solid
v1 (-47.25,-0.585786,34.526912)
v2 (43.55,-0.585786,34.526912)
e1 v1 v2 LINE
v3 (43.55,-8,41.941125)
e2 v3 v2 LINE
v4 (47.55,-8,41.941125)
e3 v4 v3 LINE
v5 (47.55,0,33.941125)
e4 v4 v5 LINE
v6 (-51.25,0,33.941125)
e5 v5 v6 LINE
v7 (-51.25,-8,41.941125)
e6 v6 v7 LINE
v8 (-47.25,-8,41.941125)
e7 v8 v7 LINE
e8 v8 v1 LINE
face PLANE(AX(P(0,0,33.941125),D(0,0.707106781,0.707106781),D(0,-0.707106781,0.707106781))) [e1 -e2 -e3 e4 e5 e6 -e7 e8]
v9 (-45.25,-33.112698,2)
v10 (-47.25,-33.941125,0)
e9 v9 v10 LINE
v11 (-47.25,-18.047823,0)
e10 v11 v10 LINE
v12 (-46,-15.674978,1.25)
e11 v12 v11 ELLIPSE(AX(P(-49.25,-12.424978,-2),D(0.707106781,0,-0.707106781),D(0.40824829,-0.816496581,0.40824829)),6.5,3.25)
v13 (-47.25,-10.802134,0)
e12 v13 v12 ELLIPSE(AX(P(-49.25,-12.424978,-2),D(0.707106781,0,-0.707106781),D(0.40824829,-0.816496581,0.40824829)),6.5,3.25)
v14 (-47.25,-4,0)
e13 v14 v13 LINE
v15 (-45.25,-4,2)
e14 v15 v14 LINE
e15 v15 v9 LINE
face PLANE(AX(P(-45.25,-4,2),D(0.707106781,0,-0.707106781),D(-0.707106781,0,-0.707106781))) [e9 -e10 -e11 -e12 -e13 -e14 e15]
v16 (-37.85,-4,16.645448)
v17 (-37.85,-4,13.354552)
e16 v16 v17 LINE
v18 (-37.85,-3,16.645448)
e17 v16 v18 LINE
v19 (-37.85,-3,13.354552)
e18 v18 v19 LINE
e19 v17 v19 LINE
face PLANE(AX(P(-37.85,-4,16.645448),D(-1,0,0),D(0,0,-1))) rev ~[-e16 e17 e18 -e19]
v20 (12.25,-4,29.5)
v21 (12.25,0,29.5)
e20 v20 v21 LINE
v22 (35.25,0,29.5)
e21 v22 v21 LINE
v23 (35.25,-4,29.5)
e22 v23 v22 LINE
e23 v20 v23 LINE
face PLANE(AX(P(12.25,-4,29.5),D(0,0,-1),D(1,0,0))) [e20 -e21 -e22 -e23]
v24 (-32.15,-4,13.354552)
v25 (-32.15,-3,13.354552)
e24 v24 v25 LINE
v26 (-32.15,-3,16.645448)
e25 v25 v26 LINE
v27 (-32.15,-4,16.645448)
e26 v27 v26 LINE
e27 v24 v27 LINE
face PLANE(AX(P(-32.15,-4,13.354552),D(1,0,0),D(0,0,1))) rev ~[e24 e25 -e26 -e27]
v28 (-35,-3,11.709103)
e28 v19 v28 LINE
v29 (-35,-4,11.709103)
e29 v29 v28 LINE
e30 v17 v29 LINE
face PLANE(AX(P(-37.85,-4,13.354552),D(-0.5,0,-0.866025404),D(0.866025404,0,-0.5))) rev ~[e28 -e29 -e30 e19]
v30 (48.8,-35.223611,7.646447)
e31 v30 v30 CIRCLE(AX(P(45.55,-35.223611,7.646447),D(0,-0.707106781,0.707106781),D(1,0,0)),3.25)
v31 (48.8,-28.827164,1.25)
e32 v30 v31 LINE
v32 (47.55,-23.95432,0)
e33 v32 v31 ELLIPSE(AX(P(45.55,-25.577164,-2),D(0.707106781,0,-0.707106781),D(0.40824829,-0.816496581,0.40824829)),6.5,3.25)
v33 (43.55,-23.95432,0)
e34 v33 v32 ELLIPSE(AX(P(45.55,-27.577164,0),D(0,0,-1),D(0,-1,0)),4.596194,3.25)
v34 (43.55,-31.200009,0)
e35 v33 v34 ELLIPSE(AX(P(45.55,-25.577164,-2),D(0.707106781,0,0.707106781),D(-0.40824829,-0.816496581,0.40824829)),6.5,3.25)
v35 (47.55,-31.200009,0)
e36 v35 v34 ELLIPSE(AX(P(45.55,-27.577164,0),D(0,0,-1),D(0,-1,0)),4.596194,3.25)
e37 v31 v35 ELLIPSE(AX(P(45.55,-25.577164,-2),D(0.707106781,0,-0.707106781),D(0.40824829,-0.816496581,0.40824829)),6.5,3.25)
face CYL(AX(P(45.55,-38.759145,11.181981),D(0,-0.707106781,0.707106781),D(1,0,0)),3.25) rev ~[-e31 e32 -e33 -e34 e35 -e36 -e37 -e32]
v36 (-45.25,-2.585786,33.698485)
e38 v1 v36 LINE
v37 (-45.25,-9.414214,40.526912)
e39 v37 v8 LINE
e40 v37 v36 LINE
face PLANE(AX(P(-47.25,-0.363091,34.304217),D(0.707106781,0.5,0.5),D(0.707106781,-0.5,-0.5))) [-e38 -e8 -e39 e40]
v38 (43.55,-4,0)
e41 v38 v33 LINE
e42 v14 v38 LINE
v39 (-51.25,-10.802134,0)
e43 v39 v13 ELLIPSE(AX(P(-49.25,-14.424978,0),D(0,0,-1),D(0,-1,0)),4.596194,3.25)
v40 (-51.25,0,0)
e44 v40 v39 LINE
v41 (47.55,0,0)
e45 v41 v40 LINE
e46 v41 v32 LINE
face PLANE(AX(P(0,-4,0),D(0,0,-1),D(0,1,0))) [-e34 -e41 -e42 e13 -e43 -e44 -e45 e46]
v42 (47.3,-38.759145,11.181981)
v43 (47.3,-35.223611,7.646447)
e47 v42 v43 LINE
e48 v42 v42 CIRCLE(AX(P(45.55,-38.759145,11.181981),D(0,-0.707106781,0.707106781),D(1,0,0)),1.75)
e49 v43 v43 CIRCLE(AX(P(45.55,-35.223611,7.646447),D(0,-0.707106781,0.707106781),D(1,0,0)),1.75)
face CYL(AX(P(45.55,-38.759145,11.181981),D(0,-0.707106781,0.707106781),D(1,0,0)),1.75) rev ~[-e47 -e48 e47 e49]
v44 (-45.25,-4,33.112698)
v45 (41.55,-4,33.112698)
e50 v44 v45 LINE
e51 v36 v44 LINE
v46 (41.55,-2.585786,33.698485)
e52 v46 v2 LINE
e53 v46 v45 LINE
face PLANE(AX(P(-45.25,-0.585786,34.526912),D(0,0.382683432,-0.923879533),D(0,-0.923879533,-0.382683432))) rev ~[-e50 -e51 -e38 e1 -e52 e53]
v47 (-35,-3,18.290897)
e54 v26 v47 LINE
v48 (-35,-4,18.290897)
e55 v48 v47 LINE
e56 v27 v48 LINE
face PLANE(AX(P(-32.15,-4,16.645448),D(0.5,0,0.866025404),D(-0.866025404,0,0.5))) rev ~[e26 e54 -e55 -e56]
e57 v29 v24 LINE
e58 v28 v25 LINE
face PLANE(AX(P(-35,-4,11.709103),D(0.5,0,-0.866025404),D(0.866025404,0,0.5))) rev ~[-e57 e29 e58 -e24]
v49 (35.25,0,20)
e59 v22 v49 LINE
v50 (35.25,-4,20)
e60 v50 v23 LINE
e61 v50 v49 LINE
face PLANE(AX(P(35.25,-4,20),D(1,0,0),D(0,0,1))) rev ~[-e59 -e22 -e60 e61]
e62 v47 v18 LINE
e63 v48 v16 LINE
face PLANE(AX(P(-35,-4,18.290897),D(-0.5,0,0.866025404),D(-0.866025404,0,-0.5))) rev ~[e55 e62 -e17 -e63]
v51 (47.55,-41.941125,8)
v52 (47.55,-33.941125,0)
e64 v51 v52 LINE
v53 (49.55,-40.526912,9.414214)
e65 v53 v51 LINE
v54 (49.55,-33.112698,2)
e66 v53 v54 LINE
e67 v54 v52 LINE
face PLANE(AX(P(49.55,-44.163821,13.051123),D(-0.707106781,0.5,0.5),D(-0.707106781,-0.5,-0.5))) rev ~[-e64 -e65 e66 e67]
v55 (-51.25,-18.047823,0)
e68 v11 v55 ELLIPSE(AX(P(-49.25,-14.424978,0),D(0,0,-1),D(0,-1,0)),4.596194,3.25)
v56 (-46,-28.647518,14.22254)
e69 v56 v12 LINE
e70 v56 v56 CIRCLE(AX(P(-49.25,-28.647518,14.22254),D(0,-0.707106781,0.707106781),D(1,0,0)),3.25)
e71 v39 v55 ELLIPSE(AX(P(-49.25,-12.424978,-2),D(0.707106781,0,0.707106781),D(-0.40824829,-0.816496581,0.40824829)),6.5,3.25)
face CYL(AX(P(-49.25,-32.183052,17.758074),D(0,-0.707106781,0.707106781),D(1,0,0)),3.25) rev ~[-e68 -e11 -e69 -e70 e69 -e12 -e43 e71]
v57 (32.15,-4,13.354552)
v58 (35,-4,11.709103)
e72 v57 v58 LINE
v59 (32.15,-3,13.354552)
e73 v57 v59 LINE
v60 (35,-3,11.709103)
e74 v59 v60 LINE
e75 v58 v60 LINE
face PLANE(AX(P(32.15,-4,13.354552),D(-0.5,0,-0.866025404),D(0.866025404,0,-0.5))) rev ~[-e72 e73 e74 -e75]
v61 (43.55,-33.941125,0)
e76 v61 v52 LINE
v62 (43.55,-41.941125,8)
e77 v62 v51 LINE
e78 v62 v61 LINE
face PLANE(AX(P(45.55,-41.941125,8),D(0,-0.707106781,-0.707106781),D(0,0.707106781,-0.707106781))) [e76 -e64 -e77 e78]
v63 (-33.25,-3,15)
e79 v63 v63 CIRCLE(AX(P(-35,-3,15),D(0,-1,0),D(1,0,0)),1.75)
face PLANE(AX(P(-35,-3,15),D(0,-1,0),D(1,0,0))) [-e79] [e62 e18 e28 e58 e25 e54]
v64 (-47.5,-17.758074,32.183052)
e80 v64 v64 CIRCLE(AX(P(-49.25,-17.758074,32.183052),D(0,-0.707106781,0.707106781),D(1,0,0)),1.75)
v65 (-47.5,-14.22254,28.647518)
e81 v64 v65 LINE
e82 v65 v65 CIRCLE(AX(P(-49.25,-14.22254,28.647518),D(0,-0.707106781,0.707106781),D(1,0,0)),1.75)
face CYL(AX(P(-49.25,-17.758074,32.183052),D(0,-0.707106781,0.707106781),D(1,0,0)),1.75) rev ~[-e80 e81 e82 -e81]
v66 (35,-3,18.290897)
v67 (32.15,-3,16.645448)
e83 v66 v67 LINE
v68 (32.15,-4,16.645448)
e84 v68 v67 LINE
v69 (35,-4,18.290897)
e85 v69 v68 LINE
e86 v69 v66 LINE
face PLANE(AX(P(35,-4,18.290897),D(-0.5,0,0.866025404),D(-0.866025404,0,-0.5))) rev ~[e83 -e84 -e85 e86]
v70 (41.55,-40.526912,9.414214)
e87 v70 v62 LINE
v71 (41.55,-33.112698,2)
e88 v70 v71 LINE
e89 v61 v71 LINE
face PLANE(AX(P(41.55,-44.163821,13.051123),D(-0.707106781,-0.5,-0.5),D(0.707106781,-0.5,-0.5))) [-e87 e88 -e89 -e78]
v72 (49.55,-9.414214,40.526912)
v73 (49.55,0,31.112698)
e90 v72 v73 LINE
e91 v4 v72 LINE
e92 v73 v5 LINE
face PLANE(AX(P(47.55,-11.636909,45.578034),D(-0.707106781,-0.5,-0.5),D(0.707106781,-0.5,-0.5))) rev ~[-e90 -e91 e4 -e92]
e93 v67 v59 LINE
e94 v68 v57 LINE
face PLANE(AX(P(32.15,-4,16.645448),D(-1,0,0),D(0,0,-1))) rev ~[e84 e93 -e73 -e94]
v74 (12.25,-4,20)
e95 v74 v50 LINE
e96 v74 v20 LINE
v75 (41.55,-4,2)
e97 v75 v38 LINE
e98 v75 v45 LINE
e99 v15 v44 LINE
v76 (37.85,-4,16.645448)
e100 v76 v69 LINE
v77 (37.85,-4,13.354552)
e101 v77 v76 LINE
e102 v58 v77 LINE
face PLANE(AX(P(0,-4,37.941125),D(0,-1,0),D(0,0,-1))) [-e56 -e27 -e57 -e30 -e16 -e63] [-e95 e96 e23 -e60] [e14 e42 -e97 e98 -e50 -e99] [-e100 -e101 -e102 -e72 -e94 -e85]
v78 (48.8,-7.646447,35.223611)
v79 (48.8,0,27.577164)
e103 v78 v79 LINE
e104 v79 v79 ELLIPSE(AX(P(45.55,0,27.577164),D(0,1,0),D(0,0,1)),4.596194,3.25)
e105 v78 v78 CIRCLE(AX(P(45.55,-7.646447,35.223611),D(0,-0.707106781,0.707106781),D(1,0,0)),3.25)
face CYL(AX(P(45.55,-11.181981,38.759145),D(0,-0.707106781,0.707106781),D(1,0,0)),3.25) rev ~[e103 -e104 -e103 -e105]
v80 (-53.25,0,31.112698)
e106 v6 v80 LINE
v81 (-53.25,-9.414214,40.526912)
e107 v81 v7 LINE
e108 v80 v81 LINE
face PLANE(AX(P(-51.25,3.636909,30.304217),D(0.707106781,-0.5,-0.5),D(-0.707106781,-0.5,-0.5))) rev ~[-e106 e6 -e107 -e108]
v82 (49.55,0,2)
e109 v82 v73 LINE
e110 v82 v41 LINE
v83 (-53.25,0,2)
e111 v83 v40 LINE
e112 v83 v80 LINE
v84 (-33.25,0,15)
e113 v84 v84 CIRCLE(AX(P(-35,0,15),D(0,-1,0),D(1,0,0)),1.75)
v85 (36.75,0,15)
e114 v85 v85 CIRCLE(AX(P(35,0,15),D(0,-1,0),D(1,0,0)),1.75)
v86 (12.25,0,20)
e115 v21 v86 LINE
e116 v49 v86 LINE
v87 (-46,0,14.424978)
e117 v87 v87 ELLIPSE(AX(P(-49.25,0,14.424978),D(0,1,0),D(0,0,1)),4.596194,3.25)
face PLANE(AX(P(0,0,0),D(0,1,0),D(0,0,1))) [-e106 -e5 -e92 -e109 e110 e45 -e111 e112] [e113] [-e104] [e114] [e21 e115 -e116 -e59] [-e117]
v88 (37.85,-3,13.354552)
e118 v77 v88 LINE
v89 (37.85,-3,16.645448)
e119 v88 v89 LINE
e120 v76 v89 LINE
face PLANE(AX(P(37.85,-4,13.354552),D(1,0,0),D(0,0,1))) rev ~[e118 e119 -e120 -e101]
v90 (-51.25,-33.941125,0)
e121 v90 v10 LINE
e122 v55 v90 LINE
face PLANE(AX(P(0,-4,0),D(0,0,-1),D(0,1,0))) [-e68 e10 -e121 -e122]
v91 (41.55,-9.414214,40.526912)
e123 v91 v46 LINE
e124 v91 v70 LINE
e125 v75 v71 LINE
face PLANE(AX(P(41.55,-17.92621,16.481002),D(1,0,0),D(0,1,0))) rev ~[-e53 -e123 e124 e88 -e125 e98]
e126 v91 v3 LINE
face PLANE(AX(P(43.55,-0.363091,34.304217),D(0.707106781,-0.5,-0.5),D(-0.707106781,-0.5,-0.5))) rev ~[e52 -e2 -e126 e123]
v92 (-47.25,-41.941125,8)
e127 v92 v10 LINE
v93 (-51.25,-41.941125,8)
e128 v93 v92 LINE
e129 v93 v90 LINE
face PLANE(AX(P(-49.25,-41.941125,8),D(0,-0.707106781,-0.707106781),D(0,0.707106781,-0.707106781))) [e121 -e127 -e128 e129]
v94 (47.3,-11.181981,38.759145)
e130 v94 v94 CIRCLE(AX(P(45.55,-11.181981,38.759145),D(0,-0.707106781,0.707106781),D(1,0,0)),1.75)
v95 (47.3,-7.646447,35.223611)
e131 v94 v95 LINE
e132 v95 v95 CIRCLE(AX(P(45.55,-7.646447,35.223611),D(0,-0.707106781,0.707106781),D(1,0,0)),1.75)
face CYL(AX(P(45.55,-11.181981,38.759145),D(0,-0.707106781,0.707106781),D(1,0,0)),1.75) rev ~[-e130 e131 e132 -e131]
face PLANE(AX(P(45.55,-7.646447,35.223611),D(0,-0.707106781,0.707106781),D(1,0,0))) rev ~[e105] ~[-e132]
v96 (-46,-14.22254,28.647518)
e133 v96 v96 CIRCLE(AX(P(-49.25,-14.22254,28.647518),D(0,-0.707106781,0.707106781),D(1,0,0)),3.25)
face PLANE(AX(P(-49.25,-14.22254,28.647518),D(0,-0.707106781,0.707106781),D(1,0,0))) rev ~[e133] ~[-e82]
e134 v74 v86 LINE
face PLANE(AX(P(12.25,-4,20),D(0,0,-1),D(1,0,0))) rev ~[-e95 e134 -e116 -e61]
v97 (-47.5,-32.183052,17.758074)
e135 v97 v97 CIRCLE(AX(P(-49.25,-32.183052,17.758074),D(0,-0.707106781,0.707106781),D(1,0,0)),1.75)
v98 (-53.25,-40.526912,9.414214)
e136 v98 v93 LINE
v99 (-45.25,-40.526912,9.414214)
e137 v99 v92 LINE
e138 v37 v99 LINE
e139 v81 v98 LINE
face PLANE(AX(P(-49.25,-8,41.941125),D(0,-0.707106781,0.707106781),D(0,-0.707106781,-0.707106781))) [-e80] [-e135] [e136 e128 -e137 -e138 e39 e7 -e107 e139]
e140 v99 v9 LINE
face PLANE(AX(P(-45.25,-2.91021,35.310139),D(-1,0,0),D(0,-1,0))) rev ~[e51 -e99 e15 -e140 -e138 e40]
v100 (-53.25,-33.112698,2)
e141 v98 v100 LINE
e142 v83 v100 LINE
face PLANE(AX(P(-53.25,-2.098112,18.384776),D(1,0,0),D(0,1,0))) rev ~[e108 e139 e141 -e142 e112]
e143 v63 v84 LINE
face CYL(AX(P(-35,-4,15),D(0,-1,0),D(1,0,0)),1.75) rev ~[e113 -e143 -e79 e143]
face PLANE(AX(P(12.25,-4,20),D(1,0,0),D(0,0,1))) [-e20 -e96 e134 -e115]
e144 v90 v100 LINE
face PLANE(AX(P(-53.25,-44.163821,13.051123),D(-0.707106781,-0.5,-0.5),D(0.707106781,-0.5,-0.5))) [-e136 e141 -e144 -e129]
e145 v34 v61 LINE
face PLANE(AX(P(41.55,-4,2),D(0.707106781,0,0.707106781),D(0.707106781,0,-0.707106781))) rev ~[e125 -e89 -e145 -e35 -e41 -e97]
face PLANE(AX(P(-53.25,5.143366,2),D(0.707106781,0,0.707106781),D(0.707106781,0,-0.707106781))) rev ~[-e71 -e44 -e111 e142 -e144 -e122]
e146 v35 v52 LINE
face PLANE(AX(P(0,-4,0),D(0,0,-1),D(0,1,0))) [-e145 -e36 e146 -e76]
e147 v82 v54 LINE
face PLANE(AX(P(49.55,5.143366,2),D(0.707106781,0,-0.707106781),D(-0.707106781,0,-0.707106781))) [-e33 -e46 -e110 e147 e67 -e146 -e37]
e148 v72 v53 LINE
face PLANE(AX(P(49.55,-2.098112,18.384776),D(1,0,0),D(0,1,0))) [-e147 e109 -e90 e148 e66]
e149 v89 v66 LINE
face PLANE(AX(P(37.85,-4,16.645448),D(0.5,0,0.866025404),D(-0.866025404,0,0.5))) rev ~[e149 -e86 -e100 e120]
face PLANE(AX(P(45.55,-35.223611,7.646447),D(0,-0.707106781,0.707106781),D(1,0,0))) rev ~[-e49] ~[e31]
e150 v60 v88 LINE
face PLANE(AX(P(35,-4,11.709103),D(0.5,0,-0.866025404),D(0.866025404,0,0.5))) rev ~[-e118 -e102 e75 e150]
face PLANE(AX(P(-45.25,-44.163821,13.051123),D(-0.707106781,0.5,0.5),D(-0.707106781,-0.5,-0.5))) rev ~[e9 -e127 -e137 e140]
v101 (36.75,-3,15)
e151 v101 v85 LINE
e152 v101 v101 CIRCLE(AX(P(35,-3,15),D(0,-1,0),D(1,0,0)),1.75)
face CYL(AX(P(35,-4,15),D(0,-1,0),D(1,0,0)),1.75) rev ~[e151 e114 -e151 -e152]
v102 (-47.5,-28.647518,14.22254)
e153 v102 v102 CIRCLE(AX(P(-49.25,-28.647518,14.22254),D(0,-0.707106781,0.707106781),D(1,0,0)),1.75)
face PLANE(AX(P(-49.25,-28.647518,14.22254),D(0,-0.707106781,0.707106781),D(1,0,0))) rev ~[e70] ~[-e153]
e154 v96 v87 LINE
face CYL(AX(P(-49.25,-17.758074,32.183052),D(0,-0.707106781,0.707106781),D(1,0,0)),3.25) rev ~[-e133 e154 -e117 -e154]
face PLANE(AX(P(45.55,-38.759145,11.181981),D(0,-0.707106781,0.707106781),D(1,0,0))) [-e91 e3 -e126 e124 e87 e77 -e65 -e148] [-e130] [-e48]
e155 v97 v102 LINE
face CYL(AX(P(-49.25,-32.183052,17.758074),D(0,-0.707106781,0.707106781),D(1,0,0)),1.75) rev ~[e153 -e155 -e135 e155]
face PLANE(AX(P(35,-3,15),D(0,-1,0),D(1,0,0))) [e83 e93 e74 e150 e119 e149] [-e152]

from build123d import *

# Parameters (mm, degrees)
F2_DEPTH      = 4
F5_DEPTH      = 49.55
F5_DEPTH_BACK = 53.25
F6_R          = 3.25
F6_R_2        = 1.75
F7_DEPTH      = 35.314708499
F8_DEPTH      = 5
F9_R          = 1.75
F9_W          = 23
F9_H          = 9.5
F10_DEPTH     = 4.001
F11_DEPTH     = 1
F12_T1_DEPTH  = 21.6004404508
F12_T3_DEPTH  = 86.8
F12_T5_DEPTH  = 21.6004404508
F12_T7_DEPTH  = 44.2278574488
F12_T9_DEPTH  = 35.0844914729
F12_T14_DEPTH = 15.9435862014
F12_T19_DEPTH = 15.9435862014
F12_T25_DEPTH = 98.9490097203
F12_S28_R     = 3.25
F12_T29_DEPTH = 51
F12_T32_DEPTH = 10.8002202254
F12_T39_DEPTH = 10.8002202254
F12_T43_DEPTH = 98.9490097203


# Not quite as in the source:
# - a fillet or chamfer that OpenCascade refuses, or shapes differently, is made with other operations: its cross-section is extruded or revolved along the edge and cut away or added


with BuildPart() as f2:
    # F0 (on Right) → F2 (new body, symmetric)
    with BuildSketch(Plane.YZ):
        Polygon((-8, 41.941125497), (-24.9705627485, 24.9705627485), (-41.941125497, 8), (-33.941125497, 0), (-4, 0), (-4, 37.941125497), align=None)
    extrude(amount=F2_DEPTH, both=True)


with BuildPart() as f3_1:
    # F3: copy of F2
    add(f2.part.moved(Location((-49.25, 0, 0))))


with BuildPart() as f2_1:
    # F4: moved
    add(f2.part.moved(Location((45.55, 0, 0))))


    add(f3_1.part)  # F5 merges F3_1
    # F0 (on Right) → F5 (join, two sides)
    with BuildSketch(Plane.YZ) as f5_sk:
        Polygon((0, 33.941125497), (-4, 37.941125497), (-4, 0), (0, 0), align=None)
    extrude(amount=F5_DEPTH)
    extrude(f5_sk.sketch, amount=-F5_DEPTH_BACK)

    # F6 (on line) → F7 (cut, through all)
    with BuildSketch(Plane(origin=(0, -24.9705627485, 24.9705627485), x_dir=(1, 0, 0), z_dir=(0, -0.7071067812, 0.7071067812))):
        with Locations((-49.25, 10.2)):
            Circle(F6_R)
        with Locations((-49.25, 10.2)):
            Circle(F6_R_2, mode=Mode.SUBTRACT)
        with Locations((-49.25, 10.2)):
            Circle(F6_R_2)
        with Locations((-49.25, -10.2)):
            Circle(F6_R)
        with Locations((-49.25, -10.2)):
            Circle(F6_R_2, mode=Mode.SUBTRACT)
        with Locations((-49.25, -10.2)):
            Circle(F6_R_2)
        with Locations((45.55, 19.5)):
            Circle(F6_R)
        with Locations((45.55, 19.5)):
            Circle(F6_R_2, mode=Mode.SUBTRACT)
        with Locations((45.55, 19.5)):
            Circle(F6_R_2)
        with Locations((45.55, -19.5)):
            Circle(F6_R)
        with Locations((45.55, -19.5)):
            Circle(F6_R_2, mode=Mode.SUBTRACT)
        with Locations((45.55, -19.5)):
            Circle(F6_R_2)
    extrude(amount=-F7_DEPTH, mode=Mode.SUBTRACT)

    # F6 (on line) → F8 (join)
    with BuildSketch(Plane(origin=(0, -24.9705627485, 24.9705627485), x_dir=(1, 0, 0), z_dir=(0, -0.7071067812, 0.7071067812))):
        with Locations((45.55, -19.5)):
            Circle(F6_R)
        with Locations((45.55, -19.5)):
            Circle(F6_R_2, mode=Mode.SUBTRACT)
        with Locations((45.55, 19.5)):
            Circle(F6_R)
        with Locations((45.55, 19.5)):
            Circle(F6_R_2, mode=Mode.SUBTRACT)
        with Locations((-49.25, 10.2)):
            Circle(F6_R)
        with Locations((-49.25, 10.2)):
            Circle(F6_R_2, mode=Mode.SUBTRACT)
        with Locations((-49.25, -10.2)):
            Circle(F6_R)
        with Locations((-49.25, -10.2)):
            Circle(F6_R_2, mode=Mode.SUBTRACT)
    extrude(amount=-F8_DEPTH)

    # F9 (on face) → F10 (cut, through all)
    with BuildSketch(Plane.XZ.offset(4)):
        with Locations((-35, 15)):
            Circle(F9_R)
        with Locations((35, 15)):
            Circle(F9_R)
        with Locations((23.75, 24.75)):
            Rectangle(F9_W, F9_H)
    extrude(amount=-F10_DEPTH, mode=Mode.SUBTRACT)

    # F9 (on face) → F11 (cut)
    with BuildSketch(Plane.XZ.offset(4)):
        Polygon((-32.15, 13.3545517328), (-32.15, 16.6454482672), (-35, 18.2908965344), (-37.85, 16.6454482672), (-37.85, 13.3545517328), (-35, 11.7091034656), align=None)
        with Locations((-35, 15)):
            Circle(F9_R, mode=Mode.SUBTRACT)
        Polygon((37.85, 13.3545517328), (37.85, 16.6454482672), (35, 18.2908965344), (32.15, 16.6454482672), (32.15, 13.3545517328), (35, 11.7091034656), align=None)
        with Locations((35, 15)):
            Circle(F9_R, mode=Mode.SUBTRACT)
    extrude(amount=-F11_DEPTH, mode=Mode.SUBTRACT)

    # F12: chamfer of 2 on 13 edges, made by hand

    # F12_s2 → F12_t1 (cut)
    with BuildSketch(Plane(origin=(0, -28.6074717082, 28.6074717082), x_dir=(1, 0, 0), z_dir=(0, 0.7071067812, -0.7071067812))):
        Polygon((47.55, -24), (49.55, -22), (49.55, -24), align=None)
        Polygon((-53.25, 22), (-51.25, 24), (-53.25, 24), align=None)
        Polygon((-45.25, 22), (-47.25, 24), (-45.25, 24), align=None)
        Polygon((41.55, 22), (43.55, 24), (41.55, 24), align=None)
        Polygon((49.55, 22), (47.55, 24), (49.55, 24), align=None)
    extrude(amount=F12_T1_DEPTH, mode=Mode.SUBTRACT)

    # F12_s4 → F12_t3 (cut)
    with BuildSketch(Plane.YZ.offset(-45.25)):
        Polygon((-0.5857864376, 34.5269119346), (-4, 33.1126983722), (-4, 37.941125497), align=None)
    extrude(amount=F12_T3_DEPTH, mode=Mode.SUBTRACT)

    # F12_s6 → F12_t5 (cut)
    with BuildSketch(Plane(origin=(0, -13.3336537888, 13.3336537888), x_dir=(1, 0, 0), z_dir=(0, -0.7071067812, 0.7071067812))):
        Polygon((-51.25, 24), (-53.25, 22), (-53.25, 24), align=None)
    extrude(amount=F12_T5_DEPTH, mode=Mode.SUBTRACT)

    # F12_s8 → F12_t7 (cut)
    with BuildSketch(Plane.XZ.offset(-5.1433659759)):
        Polygon((-53.25, 2), (-51.25, 0), (-53.25, 0), align=None)
        Polygon((49.55, 2), (47.55, 0), (49.55, 0), align=None)
    extrude(amount=F12_T7_DEPTH, mode=Mode.SUBTRACT)

    # F12_s10 → F12_t9 (cut)
    with BuildSketch(Plane.XZ.offset(4)):
        Polygon((-45.25, 2), (-47.25, 0), (-45.25, 0), align=None)
        Polygon((41.55, 2), (43.55, 0), (41.55, 0), align=None)
    extrude(amount=F12_T9_DEPTH, mode=Mode.SUBTRACT)


with BuildPart() as f12_tool12:
    # F12_s13 → F12_t14 (new body)
    with BuildSketch(Plane(origin=(0, -17.3336537888, 17.3336537888), x_dir=(1, 0, 0), z_dir=(0, -0.7071067812, 0.7071067812))):
        Polygon((-47.25, 24), (-45.25, 22), (-45.25, 24), align=None)
    extrude(amount=F12_T14_DEPTH)

    split(bisect_by=Plane.XZ.offset(4), keep=Keep.TOP)


with BuildPart() as f2_2:
    add(f2_1.part)

    # F12_t11: cut F12_tool12
    add(f12_tool12.part, mode=Mode.SUBTRACT)


with BuildPart() as f12_tool17:
    # F12_s18 → F12_t19 (new body)
    with BuildSketch(Plane(origin=(0, -17.3336537888, 17.3336537888), x_dir=(1, 0, 0), z_dir=(0, -0.7071067812, 0.7071067812))):
        Polygon((43.55, 24), (41.55, 22), (41.55, 24), align=None)
    extrude(amount=F12_T19_DEPTH)

    split(bisect_by=Plane.XZ.offset(4), keep=Keep.TOP)


with BuildPart() as f2_3:
    add(f2_2.part)

    # F12_t16: cut F12_tool17
    add(f12_tool17.part, mode=Mode.SUBTRACT)


with BuildPart() as f12_tool23:
    # F12_s24 → F12_t25 (new body)
    with BuildSketch(Plane.YZ.offset(53.6990097203)):
        Polygon((-0.5857864376, 34.5269119346), (-4, 33.1126983722), (-4, 37.941125497), align=None)
    extrude(amount=-F12_T25_DEPTH)

    split(bisect_by=Plane.YZ.offset(41.55), keep=Keep.TOP)

    split(bisect_by=Plane.YZ.offset(49.55), keep=Keep.BOTTOM)

    # F12_s28 → F12_t29 (cut, symmetric)
    with BuildSketch(Plane(origin=(0, -18.8797510577, 18.8797510577), x_dir=(1, 0, 0), z_dir=(0, -0.7071067812, 0.7071067812))):
        with Locations((45.55, 19.5)):
            Circle(F12_S28_R)
    extrude(amount=F12_T29_DEPTH, both=True, mode=Mode.SUBTRACT)


with BuildPart() as f12_tool30:
    # F12_s31 → F12_t32 (new body)
    with BuildSketch(Plane(origin=(0, -17.3336537888, 17.3336537888), x_dir=(1, 0, 0), z_dir=(0, -0.7071067812, 0.7071067812))):
        Polygon((43.55, 24), (41.55, 22), (41.55, 24), align=None)
    extrude(amount=F12_T32_DEPTH)

    split(bisect_by=Plane.XZ.offset(4), keep=Keep.BOTTOM)


with BuildPart() as f12_tool23_1:
    add(f12_tool23.part)

    # F12_t34: intersect F12_tool30
    add(f12_tool30.part, mode=Mode.INTERSECT)


with BuildPart() as f2_4:
    add(f2_3.part)

    # F12_t21: cut F12_tool23
    add(f12_tool23_1.part, mode=Mode.SUBTRACT)


with BuildPart() as f12_tool37:
    # F12_s38 → F12_t39 (new body)
    with BuildSketch(Plane(origin=(0, -17.3336537888, 17.3336537888), x_dir=(1, 0, 0), z_dir=(0, -0.7071067812, 0.7071067812))):
        Polygon((-47.25, 24), (-45.25, 22), (-45.25, 24), align=None)
    extrude(amount=F12_T39_DEPTH)

    split(bisect_by=Plane.XZ.offset(4), keep=Keep.BOTTOM)


with BuildPart() as f12_tool41:
    # F12_s42 → F12_t43 (new body)
    with BuildSketch(Plane.YZ.offset(41.55)):
        Polygon((-0.5857864376, 34.5269119346), (-4, 33.1126983722), (-4, 37.941125497), align=None)
    extrude(amount=-F12_T43_DEPTH)

    split(bisect_by=Plane.YZ.offset(-45.25), keep=Keep.BOTTOM)

    split(bisect_by=Plane.YZ.offset(-53.25), keep=Keep.TOP)


with BuildPart() as f12_tool37_1:
    add(f12_tool37.part)

    # F12_t46: intersect F12_tool41
    add(f12_tool41.part, mode=Mode.INTERSECT)


with BuildPart() as f2_5:
    add(f2_4.part)

    # F12_t35: cut F12_tool37
    add(f12_tool37_1.part, mode=Mode.SUBTRACT)


solid = f2_5.part
